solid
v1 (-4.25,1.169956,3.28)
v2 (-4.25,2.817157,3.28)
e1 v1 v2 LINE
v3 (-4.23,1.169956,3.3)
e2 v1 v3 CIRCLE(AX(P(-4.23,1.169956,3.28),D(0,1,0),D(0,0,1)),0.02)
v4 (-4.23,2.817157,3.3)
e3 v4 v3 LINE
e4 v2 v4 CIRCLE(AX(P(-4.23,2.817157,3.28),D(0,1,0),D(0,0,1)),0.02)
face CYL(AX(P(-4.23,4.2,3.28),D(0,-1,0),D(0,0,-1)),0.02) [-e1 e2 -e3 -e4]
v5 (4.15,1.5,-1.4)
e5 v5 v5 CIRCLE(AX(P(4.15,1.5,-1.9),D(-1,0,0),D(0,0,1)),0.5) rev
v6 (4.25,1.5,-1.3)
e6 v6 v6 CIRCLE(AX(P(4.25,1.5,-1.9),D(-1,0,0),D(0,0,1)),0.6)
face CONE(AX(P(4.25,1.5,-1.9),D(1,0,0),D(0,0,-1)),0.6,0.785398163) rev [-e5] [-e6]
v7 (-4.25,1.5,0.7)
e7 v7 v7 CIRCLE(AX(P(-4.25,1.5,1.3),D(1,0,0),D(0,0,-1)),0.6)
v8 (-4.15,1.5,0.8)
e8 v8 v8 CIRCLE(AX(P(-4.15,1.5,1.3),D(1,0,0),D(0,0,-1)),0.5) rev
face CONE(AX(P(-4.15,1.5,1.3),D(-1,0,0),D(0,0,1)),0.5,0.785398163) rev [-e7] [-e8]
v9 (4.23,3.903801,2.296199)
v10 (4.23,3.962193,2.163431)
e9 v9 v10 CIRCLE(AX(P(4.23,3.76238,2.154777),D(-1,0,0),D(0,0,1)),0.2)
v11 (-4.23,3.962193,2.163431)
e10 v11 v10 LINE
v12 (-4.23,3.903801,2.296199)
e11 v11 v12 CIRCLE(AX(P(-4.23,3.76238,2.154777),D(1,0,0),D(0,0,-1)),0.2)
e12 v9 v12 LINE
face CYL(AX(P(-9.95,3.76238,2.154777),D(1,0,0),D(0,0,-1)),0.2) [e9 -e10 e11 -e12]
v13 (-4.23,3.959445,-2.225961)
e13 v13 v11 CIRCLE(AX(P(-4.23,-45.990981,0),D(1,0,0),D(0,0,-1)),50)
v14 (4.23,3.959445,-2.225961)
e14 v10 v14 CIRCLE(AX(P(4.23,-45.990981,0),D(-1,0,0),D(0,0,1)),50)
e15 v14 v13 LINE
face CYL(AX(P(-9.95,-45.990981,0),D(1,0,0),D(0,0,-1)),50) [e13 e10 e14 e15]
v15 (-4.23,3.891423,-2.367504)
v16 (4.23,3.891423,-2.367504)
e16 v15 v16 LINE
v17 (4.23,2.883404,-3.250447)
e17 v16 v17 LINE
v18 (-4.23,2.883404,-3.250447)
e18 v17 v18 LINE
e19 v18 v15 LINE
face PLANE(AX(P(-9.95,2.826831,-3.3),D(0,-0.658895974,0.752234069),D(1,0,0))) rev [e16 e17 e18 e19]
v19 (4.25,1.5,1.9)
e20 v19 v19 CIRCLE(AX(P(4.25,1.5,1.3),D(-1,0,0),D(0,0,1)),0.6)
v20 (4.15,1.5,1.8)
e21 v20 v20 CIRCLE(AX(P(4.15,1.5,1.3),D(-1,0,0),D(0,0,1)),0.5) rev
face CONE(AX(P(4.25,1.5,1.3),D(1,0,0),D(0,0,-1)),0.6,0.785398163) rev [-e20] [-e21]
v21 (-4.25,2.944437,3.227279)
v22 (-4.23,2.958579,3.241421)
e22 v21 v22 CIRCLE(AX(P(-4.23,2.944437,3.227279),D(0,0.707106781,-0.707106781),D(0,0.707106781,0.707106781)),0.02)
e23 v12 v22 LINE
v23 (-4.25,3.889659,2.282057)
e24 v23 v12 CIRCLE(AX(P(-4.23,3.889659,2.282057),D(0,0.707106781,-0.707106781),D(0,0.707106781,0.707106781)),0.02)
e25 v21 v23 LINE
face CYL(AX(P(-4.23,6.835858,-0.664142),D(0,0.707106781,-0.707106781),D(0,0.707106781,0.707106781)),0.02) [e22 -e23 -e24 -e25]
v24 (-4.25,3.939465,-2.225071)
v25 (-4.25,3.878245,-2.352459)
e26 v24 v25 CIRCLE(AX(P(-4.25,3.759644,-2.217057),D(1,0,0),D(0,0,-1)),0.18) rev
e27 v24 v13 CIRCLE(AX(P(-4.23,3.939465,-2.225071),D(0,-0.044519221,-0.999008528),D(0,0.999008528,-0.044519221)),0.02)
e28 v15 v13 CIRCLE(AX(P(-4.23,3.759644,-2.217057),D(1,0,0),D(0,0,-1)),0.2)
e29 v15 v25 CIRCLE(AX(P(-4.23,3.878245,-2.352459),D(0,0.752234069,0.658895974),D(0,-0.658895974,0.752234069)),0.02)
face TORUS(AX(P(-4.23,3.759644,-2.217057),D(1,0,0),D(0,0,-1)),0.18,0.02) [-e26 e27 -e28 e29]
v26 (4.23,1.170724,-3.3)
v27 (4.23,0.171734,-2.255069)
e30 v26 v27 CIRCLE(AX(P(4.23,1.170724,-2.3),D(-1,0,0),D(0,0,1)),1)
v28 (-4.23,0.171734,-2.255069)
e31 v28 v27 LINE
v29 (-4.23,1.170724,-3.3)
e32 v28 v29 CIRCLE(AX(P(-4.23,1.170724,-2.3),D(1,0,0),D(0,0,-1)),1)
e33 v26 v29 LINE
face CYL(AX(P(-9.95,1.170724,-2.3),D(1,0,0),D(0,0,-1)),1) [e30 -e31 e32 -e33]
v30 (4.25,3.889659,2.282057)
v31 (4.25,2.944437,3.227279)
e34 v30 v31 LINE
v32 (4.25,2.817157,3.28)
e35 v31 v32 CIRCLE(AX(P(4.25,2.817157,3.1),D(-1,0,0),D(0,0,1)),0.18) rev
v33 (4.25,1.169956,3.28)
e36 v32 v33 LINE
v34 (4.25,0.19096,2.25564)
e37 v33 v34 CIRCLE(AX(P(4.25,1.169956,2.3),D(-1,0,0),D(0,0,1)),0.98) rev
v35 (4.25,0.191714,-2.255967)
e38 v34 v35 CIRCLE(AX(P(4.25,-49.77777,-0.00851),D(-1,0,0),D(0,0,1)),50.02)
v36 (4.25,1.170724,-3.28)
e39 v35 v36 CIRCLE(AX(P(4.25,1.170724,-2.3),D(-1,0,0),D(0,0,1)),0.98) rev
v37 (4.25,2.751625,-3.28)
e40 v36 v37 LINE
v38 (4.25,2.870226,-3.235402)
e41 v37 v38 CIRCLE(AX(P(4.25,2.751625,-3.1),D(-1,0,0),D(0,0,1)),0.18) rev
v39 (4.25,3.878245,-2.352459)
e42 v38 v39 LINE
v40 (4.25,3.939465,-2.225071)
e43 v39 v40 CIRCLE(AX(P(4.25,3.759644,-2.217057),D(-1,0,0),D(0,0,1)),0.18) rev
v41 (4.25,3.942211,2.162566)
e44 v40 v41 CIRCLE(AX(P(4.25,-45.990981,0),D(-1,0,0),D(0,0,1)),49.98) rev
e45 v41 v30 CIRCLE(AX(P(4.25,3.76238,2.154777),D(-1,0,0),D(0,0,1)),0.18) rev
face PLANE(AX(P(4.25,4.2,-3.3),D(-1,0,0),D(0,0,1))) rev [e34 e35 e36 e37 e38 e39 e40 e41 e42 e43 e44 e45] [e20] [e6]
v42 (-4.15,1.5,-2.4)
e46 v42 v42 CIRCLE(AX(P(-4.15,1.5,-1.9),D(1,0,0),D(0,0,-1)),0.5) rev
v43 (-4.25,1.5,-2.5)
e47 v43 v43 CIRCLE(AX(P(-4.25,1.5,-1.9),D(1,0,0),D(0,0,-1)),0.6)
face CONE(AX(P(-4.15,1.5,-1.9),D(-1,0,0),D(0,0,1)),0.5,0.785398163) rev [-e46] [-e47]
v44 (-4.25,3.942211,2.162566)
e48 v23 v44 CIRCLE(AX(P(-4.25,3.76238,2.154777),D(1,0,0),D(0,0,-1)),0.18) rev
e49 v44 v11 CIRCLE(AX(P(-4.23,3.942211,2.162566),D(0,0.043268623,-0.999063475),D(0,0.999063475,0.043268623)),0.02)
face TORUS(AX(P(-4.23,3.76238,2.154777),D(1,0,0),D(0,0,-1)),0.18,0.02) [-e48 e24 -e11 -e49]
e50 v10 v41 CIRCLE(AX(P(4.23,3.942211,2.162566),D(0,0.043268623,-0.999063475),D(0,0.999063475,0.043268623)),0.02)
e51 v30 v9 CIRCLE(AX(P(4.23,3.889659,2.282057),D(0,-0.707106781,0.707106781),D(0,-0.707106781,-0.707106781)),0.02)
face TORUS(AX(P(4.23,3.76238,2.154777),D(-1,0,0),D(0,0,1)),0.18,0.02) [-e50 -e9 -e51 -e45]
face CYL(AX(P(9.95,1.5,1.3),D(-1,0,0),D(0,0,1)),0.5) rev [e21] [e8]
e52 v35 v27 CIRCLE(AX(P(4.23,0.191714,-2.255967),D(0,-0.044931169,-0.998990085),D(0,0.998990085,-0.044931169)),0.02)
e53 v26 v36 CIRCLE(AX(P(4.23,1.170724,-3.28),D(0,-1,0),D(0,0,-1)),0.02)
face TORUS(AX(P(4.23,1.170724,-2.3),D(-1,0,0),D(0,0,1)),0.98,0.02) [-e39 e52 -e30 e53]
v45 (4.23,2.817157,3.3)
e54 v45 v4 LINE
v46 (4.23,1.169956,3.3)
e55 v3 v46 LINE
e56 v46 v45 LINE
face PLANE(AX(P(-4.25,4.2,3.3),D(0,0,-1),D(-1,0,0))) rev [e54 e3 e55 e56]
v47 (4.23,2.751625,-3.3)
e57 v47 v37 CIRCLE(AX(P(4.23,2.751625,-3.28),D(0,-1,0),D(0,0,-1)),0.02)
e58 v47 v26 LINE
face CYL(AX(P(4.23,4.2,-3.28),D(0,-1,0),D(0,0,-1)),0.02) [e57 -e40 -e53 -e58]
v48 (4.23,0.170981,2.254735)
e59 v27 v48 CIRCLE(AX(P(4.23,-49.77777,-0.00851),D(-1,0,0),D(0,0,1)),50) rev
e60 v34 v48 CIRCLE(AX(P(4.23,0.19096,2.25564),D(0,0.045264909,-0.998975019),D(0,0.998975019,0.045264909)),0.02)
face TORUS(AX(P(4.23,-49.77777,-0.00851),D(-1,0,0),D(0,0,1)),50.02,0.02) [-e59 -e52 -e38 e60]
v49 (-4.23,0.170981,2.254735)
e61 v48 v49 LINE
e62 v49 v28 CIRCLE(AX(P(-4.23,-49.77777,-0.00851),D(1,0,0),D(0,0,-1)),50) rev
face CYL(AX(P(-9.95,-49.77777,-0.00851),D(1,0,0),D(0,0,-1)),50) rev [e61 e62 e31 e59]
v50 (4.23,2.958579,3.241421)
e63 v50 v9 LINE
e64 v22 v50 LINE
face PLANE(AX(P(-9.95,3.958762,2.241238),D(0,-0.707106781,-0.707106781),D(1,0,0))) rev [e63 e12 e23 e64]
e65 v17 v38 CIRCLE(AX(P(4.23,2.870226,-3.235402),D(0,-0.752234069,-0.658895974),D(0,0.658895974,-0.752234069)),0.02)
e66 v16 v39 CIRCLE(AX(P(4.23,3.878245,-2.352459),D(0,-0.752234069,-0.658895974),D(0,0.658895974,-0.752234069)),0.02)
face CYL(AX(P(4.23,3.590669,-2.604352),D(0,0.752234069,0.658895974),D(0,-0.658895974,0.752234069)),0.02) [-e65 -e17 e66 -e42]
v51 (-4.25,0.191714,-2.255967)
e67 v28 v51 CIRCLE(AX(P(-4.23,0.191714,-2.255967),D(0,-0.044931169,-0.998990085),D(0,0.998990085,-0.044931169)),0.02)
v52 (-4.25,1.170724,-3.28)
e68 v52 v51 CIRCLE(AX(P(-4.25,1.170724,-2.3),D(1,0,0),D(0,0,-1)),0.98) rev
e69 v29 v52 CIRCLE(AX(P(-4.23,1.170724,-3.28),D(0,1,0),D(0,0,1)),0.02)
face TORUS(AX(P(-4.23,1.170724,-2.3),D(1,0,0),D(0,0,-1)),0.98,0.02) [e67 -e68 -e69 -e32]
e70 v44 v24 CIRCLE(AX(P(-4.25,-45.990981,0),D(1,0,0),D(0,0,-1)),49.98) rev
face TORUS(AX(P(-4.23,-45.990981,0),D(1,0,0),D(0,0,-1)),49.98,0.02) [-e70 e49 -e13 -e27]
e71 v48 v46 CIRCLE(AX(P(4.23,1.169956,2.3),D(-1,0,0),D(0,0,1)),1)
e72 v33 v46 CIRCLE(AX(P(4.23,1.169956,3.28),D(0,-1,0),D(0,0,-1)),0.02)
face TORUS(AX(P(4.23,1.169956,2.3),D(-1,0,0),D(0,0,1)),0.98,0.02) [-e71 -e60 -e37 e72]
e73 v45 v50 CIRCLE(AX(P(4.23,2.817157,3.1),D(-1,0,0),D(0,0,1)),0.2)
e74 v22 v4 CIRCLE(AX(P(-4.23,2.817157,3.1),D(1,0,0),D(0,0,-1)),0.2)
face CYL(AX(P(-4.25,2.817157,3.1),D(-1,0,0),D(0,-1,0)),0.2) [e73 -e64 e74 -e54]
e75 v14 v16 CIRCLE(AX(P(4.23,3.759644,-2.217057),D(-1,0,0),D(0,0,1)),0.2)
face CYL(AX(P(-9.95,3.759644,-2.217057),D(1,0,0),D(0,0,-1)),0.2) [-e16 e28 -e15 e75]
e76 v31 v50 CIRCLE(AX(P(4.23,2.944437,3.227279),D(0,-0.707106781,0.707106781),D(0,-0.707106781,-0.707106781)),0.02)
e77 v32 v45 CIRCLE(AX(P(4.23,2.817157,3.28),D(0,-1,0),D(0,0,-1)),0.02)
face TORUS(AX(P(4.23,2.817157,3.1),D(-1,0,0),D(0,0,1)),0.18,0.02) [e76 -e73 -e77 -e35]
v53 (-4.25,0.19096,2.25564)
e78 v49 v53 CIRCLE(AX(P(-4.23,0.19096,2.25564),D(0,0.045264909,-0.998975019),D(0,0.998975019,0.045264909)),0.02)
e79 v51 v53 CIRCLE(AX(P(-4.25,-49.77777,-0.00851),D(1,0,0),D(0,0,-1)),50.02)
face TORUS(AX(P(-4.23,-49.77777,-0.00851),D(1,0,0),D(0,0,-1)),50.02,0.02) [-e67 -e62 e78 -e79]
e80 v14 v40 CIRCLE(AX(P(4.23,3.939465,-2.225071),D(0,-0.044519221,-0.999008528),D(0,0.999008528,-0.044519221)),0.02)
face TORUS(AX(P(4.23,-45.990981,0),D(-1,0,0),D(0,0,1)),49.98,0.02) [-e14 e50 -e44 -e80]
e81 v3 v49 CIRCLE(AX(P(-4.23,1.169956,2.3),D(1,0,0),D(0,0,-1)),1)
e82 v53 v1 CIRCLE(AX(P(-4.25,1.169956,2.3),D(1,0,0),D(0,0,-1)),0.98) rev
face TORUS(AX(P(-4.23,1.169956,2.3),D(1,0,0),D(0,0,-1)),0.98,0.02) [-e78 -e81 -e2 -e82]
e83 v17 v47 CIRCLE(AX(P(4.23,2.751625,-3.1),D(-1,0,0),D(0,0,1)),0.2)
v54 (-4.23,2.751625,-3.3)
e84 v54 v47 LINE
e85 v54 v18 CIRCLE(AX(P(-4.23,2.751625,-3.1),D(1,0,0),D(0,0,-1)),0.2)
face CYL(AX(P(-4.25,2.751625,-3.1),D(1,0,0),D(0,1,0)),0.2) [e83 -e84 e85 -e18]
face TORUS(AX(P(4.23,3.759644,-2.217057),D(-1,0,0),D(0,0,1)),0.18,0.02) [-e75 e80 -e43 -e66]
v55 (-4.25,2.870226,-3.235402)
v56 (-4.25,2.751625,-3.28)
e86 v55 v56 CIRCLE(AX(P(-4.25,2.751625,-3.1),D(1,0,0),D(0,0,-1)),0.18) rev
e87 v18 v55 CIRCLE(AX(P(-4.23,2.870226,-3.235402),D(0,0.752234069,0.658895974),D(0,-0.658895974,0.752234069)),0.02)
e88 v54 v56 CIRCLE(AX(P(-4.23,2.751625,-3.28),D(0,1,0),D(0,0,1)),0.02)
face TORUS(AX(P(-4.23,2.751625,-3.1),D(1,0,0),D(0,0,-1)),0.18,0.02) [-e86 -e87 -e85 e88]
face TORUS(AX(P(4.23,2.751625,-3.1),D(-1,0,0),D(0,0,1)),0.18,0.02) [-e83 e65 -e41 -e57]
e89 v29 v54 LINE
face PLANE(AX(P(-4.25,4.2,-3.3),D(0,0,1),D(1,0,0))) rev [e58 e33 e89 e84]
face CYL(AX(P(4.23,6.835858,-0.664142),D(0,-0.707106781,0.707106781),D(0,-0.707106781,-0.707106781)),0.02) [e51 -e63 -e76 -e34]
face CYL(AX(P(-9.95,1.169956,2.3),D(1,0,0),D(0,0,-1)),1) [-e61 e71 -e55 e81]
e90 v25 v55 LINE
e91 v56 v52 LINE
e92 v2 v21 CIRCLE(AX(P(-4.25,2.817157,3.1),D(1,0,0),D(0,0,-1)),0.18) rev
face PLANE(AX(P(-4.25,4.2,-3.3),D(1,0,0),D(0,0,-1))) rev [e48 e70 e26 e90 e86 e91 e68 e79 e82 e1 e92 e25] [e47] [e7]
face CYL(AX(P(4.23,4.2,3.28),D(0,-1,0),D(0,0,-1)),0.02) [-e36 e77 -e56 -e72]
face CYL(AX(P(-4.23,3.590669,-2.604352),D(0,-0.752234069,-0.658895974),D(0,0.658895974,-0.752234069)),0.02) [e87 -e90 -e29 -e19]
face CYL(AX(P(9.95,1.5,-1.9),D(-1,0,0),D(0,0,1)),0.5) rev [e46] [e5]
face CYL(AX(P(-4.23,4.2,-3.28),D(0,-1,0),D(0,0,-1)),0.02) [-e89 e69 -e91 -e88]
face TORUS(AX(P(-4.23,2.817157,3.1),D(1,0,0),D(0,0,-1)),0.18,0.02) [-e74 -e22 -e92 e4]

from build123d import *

# Parameters (mm, degrees)
SKETCH1_W           = 8.5
SKETCH1_H           = 6.6
BOSS_EXTRUDE1_DEPTH = 4.2
CUT_EXTRUDE1_DEPTH  = 14.2
CHAMFER1_SIZE       = 1.073169072
CHAMFER1_SIZE_2     = 1
FILLET1_R           = 1
FILLET2_R           = 0.2
FILLET3_R           = 0.02
SKETCH3_R           = 0.5
CUT_EXTRUDE2_DEPTH  = 14.2
CHAMFER2_SIZE       = 0.1


with BuildPart() as part:
    # Sketch1 → Boss-Extrude1 (new body)
    with BuildSketch(Plane(origin=(0, 0, 0), x_dir=(1, 0, 0), z_dir=(0, 1, 0))):
        Rectangle(SKETCH1_W, SKETCH1_H)
    extrude(amount=BOSS_EXTRUDE1_DEPTH)

    # Sketch2 → Cut-Extrude1 (cut)
    with BuildSketch(Plane(origin=(4.25, 0, 0), x_dir=(0, 0, -1), z_dir=(1, 0, 0))):
        with BuildLine():
            Line((-3.3, 3.9), (-5.253535024, 5.241651662))
            Line((-5.253535024, 5.241651662), (3.889156526, 7.141243929))
            Line((3.889156526, 7.141243929), (5.679183493, 5.077233243))
            Line((5.679183493, 5.077233243), (3.3, 3.9))
            ThreePointArc((3.3, 3.9), (0, 4.009018851), (-3.3, 3.9))
        make_face()
        with BuildLine():
            Line((4.717394395, 0), (0, -2.904825783))
            Line((0, -2.904825783), (-4.70037365, 0))
            ThreePointArc((-4.70037365, 0), (0.008510373, 0.222229748), (4.717394395, 0))
        make_face()
    extrude(amount=-CUT_EXTRUDE1_DEPTH, mode=Mode.SUBTRACT)

    # Chamfer1
    # the kernel refuses this chamfer: 1.073169072, 1 mm, written as the material it takes off along each edge
    with BuildSketch(Plane(origin=(7.014554566, 3.9, -3.3), x_dir=(0, -1, 0), z_dir=(-1, 0, 0))) as chamfer1_piece_1:
        with BuildLine():
            Line((CHAMFER1_SIZE, 0), (-0.05556839, 0.98868238))
            ThreePointArc((-0.05556839, 0.98868238), (-0.031072564, 0.509202078), (0, 0))
            Line((0, 0), (CHAMFER1_SIZE, 0))
        make_face()
    extrude(amount=14.029109133, mode=Mode.SUBTRACT)
    with BuildSketch(Plane(origin=(6.981889399, 3.9, 3.3), x_dir=(0, 0.05541549441613883, -0.9984633808901632), z_dir=(-1, 0, 0))) as chamfer1_piece_2:
        with BuildLine():
            Line((1.060391539, 0), (-CHAMFER1_SIZE_2 * 0.0554154944161, CHAMFER1_SIZE_2 * 0.99846338089))
            Line((-CHAMFER1_SIZE_2 * 0.0554154944161, CHAMFER1_SIZE_2 * 0.99846338089), (0, 0))
            ThreePointArc((0, 0), (0.546186707, -0.002808597), (1.060391539, 0))
        make_face()
    extrude(amount=13.963778797, mode=Mode.SUBTRACT)

    # Fillet1
    fillet1_edges = [part.edges().sort_by_distance(p)[0] for p in [
        (0, 0.11377308, -3.3),
        (0, 0.112647256, 3.3),
    ]]
    fillet(fillet1_edges, radius=FILLET1_R)

    # Fillet2
    fillet2_edges = [part.edges().sort_by_distance(p)[0] for p in [
        (0, 2.826830928, -3.3),
        (0, 3.958762121, 2.241237879),
        (0, 3.95556839, -2.31131762),
        (0, 2.9, 3.3),
    ]]
    fillet(fillet2_edges, radius=FILLET2_R)

    # Fillet3
    fillet3_edges = [part.edges().sort_by_distance(p)[0] for p in [
        (4.25, 0.22222905, -0.000158372),
        (4.25, 0.447906277, -2.99103865),
        (4.25, 0.447022472, 2.990917901),
        (-4.25, 0.22222905, -0.000158372),
        (-4.25, 0.447906277, -2.99103865),
        (-4.25, 0.447022472, 2.990917901),
        (4.25, 1.961174313, -3.3),
        (-4.25, 1.961174313, -3.3),
        (4.25, 1.993556495, 3.3),
        (4.25, 3.387413237, -2.808975408),
        (4.25, 4.009009057, -0.031295116),
        (4.25, 3.431189943, 2.768810057),
        (4.25, 2.893693974, 3.284775907),
        (4.25, 3.94545632, 2.235294601),
        (4.25, 3.939907453, -2.30368815),
        (4.25, 2.822018564, -3.287202247),
        (-4.25, 3.387413237, -2.808975408),
        (-4.25, 1.993556495, 3.3),
        (-4.25, 3.431189943, 2.768810057),
        (-4.25, 4.009009057, -0.031295116),
        (-4.25, 2.893693974, 3.284775907),
        (-4.25, 3.94545632, 2.235294601),
        (-4.25, 3.939907453, -2.30368815),
        (-4.25, 2.822018564, -3.287202247),
    ]]
    fillet(fillet3_edges, radius=FILLET3_R)

    # Sketch3 → Cut-Extrude2 (cut)
    with BuildSketch(Plane.ZY.offset(4.25)):
        with Locations((-1.9, 1.5)):
            Circle(SKETCH3_R)
        with Locations((1.3, 1.5)):
            Circle(SKETCH3_R)
    extrude(amount=-CUT_EXTRUDE2_DEPTH, mode=Mode.SUBTRACT)

    # Chamfer2
    chamfer2_edges = [part.edges().sort_by_distance(p)[0] for p in [
        (4.25, 1.5, -2.4),
        (-4.25, 1.5, -2.4),
        (4.25, 1.5, 0.8),
        (-4.25, 1.5, 0.8),
    ]]
    chamfer(chamfer2_edges, length=CHAMFER2_SIZE)


solid = part.part
